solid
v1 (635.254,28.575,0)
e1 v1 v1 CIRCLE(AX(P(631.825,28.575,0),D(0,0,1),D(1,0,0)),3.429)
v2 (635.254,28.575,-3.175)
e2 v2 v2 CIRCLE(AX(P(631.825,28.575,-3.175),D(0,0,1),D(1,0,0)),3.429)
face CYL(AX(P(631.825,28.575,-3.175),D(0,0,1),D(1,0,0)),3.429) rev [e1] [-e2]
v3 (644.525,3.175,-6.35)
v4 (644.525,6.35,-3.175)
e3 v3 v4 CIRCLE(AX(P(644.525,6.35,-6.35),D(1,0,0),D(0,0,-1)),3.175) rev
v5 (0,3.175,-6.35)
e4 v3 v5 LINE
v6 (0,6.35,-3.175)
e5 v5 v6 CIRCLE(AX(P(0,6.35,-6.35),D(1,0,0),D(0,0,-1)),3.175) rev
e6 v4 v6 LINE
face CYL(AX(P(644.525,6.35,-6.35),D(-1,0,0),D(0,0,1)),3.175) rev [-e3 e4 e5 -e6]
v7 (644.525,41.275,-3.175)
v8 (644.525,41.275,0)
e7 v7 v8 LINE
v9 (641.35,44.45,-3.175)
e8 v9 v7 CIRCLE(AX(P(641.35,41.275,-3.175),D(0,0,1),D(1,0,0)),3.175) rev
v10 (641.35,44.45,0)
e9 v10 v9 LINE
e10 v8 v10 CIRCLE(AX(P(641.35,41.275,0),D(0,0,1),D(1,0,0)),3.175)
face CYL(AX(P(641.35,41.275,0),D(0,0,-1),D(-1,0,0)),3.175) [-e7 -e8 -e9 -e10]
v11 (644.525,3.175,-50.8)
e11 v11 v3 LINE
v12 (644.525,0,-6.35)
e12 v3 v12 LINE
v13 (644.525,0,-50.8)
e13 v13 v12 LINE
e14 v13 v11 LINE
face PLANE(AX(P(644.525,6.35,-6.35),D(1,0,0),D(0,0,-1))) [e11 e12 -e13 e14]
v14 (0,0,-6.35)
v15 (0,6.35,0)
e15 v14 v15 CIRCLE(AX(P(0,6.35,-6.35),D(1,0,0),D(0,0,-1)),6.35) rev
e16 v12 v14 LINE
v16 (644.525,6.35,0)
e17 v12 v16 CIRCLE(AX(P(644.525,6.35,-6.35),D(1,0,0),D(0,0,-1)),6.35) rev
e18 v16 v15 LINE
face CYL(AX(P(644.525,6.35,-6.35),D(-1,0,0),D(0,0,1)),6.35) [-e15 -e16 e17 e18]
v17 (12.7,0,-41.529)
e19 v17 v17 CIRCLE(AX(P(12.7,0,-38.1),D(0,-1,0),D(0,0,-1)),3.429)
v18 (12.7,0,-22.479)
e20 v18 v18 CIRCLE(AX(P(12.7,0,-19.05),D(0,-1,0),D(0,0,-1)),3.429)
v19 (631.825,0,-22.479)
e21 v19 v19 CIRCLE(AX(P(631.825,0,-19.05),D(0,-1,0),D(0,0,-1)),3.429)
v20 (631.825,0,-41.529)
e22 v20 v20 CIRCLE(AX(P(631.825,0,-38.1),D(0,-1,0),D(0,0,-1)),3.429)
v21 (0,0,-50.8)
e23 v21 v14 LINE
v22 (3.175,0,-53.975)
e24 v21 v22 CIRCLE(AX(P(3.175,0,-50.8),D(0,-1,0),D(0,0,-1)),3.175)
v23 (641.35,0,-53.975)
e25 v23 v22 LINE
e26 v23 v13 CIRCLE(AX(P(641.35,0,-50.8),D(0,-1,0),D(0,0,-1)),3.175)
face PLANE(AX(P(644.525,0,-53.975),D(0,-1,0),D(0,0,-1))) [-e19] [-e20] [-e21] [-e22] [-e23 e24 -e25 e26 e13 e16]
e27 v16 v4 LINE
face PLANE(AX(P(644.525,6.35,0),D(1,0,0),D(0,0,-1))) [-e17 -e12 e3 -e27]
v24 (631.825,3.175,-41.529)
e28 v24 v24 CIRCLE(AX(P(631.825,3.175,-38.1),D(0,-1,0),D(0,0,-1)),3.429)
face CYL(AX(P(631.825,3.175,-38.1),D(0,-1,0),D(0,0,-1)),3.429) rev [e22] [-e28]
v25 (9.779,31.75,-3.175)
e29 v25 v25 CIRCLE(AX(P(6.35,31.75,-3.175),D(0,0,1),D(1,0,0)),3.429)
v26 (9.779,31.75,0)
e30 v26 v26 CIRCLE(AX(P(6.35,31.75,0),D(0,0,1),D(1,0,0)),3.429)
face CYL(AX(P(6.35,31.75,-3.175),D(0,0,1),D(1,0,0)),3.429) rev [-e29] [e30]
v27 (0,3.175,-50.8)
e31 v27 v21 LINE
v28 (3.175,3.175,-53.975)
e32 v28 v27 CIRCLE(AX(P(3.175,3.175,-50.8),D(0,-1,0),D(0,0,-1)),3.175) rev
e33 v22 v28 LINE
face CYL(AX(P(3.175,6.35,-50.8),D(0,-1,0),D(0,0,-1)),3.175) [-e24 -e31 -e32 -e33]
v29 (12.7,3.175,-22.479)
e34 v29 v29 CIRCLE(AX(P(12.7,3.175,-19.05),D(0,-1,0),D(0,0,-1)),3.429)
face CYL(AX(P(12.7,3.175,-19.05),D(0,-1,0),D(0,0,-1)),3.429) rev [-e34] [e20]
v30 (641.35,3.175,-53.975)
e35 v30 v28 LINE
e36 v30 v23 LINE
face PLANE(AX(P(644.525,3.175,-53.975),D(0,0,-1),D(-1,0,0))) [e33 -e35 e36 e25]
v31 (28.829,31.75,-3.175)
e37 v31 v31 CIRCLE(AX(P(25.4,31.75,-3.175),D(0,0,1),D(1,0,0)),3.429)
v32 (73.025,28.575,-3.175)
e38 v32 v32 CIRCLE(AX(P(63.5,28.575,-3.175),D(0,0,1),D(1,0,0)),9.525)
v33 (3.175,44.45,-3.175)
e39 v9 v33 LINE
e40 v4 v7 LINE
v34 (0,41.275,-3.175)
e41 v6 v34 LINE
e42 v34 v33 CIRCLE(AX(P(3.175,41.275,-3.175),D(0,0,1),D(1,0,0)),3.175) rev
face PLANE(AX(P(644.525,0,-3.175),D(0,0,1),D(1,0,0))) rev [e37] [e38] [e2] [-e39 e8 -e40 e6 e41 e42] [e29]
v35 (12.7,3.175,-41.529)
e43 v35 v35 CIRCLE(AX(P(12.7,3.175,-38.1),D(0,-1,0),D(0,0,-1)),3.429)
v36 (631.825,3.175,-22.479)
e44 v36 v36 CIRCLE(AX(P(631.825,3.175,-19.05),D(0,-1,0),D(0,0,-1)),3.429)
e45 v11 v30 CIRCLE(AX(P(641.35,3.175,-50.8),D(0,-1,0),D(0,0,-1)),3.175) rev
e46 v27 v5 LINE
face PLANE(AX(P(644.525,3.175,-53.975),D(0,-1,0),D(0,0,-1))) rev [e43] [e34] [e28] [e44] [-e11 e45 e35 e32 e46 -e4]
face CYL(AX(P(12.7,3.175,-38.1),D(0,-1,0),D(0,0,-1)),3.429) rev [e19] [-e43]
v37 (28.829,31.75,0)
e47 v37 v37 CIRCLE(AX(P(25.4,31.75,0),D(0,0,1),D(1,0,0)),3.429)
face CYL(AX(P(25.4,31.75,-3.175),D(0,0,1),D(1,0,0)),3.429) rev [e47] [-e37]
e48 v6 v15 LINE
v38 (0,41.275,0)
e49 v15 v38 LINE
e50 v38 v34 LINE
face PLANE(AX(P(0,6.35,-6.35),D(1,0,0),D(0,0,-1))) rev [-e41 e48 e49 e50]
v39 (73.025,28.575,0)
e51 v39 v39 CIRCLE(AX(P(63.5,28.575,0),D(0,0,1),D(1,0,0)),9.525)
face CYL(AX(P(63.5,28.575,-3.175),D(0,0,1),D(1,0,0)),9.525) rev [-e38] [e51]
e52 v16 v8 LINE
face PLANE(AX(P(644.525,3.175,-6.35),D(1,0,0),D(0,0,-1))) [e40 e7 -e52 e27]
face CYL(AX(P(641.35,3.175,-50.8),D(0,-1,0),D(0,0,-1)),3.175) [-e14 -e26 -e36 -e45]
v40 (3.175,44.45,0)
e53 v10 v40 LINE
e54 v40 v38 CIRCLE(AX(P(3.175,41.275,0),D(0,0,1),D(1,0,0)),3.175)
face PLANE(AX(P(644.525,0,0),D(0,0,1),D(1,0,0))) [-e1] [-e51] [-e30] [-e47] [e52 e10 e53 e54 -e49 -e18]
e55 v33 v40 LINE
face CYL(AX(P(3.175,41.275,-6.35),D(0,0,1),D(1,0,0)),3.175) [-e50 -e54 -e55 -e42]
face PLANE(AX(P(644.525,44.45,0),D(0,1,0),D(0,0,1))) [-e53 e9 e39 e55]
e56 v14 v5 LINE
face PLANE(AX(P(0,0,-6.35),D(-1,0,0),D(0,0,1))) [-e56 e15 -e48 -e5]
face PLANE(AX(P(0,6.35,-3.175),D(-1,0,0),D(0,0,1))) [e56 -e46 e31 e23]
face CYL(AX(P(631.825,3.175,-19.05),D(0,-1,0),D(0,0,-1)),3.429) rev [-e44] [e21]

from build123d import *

# Parameters (mm, degrees)
BASE_FLANGE1_DEPTH = 644.525
SKETCH3_R          = 3.429
CUT_EXTRUDE1_DEPTH = 3.175
SKETCH5_R          = 3.429
SKETCH5_R_2        = 9.525
CUT_EXTRUDE2_DEPTH = 3.175
FILLET1_R          = 3.175


# Read off the part's stored shape, not the designer's step: Base-Flange1
with BuildPart() as part:
    # Base-Flange1 outline → Base-Flange1 (new body)
    with BuildSketch(Plane(origin=(0, 0, 0), x_dir=(0, 0, -1), z_dir=(1, 0, 0))):
        with BuildLine():
            Line((3.175, 6.35), (3.175, 44.45))
            Line((3.175, 44.45), (0, 44.45))
            Line((0, 44.45), (0, 6.35))
            ThreePointArc((0, 6.35), (1.859871939, 1.859871939), (6.35, 0))
            Line((6.35, 0), (53.975, 0))
            Line((53.975, 0), (53.975, 3.175))
            Line((53.975, 3.175), (6.35, 3.175))
            ThreePointArc((6.35, 3.175), (4.10493597, 4.10493597), (3.175, 6.35))
        make_face()
    extrude(amount=BASE_FLANGE1_DEPTH)

    # Sketch3 → Cut-Extrude1 (cut)
    with BuildSketch(Plane.XZ):
        with Locations(Location((631.825, -19.05, 0), (0, 0, 270))):
            Circle(SKETCH3_R)
        with Locations(Location((631.825, -38.1, 0), (0, 0, 270))):
            Circle(SKETCH3_R)
        with Locations(Location((12.7, -38.1, 0), (0, 0, 270))):
            Circle(SKETCH3_R)
        with Locations(Location((12.7, -19.05, 0), (0, 0, 270))):
            Circle(SKETCH3_R)
    extrude(amount=-CUT_EXTRUDE1_DEPTH, mode=Mode.SUBTRACT)

    # Sketch5 → Cut-Extrude2 (cut)
    with BuildSketch(Plane.XY):
        with Locations((631.825, 28.575)):
            Circle(SKETCH5_R)
        with Locations((6.35, 31.75)):
            Circle(SKETCH5_R)
        with Locations((63.5, 28.575)):
            Circle(SKETCH5_R_2)
        with Locations((25.4, 31.75)):
            Circle(SKETCH5_R)
    extrude(amount=-CUT_EXTRUDE2_DEPTH, mode=Mode.SUBTRACT)

    # Fillet1
    fillet1_edges = [part.edges().sort_by_distance(p)[0] for p in [
        (644.525, 1.5875, -53.975),
        (0, 1.5875, -53.975),
        (644.525, 44.45, -1.5875),
        (0, 44.45, -1.5875),
    ]]
    fillet(fillet1_edges, radius=FILLET1_R)


solid = part.part
